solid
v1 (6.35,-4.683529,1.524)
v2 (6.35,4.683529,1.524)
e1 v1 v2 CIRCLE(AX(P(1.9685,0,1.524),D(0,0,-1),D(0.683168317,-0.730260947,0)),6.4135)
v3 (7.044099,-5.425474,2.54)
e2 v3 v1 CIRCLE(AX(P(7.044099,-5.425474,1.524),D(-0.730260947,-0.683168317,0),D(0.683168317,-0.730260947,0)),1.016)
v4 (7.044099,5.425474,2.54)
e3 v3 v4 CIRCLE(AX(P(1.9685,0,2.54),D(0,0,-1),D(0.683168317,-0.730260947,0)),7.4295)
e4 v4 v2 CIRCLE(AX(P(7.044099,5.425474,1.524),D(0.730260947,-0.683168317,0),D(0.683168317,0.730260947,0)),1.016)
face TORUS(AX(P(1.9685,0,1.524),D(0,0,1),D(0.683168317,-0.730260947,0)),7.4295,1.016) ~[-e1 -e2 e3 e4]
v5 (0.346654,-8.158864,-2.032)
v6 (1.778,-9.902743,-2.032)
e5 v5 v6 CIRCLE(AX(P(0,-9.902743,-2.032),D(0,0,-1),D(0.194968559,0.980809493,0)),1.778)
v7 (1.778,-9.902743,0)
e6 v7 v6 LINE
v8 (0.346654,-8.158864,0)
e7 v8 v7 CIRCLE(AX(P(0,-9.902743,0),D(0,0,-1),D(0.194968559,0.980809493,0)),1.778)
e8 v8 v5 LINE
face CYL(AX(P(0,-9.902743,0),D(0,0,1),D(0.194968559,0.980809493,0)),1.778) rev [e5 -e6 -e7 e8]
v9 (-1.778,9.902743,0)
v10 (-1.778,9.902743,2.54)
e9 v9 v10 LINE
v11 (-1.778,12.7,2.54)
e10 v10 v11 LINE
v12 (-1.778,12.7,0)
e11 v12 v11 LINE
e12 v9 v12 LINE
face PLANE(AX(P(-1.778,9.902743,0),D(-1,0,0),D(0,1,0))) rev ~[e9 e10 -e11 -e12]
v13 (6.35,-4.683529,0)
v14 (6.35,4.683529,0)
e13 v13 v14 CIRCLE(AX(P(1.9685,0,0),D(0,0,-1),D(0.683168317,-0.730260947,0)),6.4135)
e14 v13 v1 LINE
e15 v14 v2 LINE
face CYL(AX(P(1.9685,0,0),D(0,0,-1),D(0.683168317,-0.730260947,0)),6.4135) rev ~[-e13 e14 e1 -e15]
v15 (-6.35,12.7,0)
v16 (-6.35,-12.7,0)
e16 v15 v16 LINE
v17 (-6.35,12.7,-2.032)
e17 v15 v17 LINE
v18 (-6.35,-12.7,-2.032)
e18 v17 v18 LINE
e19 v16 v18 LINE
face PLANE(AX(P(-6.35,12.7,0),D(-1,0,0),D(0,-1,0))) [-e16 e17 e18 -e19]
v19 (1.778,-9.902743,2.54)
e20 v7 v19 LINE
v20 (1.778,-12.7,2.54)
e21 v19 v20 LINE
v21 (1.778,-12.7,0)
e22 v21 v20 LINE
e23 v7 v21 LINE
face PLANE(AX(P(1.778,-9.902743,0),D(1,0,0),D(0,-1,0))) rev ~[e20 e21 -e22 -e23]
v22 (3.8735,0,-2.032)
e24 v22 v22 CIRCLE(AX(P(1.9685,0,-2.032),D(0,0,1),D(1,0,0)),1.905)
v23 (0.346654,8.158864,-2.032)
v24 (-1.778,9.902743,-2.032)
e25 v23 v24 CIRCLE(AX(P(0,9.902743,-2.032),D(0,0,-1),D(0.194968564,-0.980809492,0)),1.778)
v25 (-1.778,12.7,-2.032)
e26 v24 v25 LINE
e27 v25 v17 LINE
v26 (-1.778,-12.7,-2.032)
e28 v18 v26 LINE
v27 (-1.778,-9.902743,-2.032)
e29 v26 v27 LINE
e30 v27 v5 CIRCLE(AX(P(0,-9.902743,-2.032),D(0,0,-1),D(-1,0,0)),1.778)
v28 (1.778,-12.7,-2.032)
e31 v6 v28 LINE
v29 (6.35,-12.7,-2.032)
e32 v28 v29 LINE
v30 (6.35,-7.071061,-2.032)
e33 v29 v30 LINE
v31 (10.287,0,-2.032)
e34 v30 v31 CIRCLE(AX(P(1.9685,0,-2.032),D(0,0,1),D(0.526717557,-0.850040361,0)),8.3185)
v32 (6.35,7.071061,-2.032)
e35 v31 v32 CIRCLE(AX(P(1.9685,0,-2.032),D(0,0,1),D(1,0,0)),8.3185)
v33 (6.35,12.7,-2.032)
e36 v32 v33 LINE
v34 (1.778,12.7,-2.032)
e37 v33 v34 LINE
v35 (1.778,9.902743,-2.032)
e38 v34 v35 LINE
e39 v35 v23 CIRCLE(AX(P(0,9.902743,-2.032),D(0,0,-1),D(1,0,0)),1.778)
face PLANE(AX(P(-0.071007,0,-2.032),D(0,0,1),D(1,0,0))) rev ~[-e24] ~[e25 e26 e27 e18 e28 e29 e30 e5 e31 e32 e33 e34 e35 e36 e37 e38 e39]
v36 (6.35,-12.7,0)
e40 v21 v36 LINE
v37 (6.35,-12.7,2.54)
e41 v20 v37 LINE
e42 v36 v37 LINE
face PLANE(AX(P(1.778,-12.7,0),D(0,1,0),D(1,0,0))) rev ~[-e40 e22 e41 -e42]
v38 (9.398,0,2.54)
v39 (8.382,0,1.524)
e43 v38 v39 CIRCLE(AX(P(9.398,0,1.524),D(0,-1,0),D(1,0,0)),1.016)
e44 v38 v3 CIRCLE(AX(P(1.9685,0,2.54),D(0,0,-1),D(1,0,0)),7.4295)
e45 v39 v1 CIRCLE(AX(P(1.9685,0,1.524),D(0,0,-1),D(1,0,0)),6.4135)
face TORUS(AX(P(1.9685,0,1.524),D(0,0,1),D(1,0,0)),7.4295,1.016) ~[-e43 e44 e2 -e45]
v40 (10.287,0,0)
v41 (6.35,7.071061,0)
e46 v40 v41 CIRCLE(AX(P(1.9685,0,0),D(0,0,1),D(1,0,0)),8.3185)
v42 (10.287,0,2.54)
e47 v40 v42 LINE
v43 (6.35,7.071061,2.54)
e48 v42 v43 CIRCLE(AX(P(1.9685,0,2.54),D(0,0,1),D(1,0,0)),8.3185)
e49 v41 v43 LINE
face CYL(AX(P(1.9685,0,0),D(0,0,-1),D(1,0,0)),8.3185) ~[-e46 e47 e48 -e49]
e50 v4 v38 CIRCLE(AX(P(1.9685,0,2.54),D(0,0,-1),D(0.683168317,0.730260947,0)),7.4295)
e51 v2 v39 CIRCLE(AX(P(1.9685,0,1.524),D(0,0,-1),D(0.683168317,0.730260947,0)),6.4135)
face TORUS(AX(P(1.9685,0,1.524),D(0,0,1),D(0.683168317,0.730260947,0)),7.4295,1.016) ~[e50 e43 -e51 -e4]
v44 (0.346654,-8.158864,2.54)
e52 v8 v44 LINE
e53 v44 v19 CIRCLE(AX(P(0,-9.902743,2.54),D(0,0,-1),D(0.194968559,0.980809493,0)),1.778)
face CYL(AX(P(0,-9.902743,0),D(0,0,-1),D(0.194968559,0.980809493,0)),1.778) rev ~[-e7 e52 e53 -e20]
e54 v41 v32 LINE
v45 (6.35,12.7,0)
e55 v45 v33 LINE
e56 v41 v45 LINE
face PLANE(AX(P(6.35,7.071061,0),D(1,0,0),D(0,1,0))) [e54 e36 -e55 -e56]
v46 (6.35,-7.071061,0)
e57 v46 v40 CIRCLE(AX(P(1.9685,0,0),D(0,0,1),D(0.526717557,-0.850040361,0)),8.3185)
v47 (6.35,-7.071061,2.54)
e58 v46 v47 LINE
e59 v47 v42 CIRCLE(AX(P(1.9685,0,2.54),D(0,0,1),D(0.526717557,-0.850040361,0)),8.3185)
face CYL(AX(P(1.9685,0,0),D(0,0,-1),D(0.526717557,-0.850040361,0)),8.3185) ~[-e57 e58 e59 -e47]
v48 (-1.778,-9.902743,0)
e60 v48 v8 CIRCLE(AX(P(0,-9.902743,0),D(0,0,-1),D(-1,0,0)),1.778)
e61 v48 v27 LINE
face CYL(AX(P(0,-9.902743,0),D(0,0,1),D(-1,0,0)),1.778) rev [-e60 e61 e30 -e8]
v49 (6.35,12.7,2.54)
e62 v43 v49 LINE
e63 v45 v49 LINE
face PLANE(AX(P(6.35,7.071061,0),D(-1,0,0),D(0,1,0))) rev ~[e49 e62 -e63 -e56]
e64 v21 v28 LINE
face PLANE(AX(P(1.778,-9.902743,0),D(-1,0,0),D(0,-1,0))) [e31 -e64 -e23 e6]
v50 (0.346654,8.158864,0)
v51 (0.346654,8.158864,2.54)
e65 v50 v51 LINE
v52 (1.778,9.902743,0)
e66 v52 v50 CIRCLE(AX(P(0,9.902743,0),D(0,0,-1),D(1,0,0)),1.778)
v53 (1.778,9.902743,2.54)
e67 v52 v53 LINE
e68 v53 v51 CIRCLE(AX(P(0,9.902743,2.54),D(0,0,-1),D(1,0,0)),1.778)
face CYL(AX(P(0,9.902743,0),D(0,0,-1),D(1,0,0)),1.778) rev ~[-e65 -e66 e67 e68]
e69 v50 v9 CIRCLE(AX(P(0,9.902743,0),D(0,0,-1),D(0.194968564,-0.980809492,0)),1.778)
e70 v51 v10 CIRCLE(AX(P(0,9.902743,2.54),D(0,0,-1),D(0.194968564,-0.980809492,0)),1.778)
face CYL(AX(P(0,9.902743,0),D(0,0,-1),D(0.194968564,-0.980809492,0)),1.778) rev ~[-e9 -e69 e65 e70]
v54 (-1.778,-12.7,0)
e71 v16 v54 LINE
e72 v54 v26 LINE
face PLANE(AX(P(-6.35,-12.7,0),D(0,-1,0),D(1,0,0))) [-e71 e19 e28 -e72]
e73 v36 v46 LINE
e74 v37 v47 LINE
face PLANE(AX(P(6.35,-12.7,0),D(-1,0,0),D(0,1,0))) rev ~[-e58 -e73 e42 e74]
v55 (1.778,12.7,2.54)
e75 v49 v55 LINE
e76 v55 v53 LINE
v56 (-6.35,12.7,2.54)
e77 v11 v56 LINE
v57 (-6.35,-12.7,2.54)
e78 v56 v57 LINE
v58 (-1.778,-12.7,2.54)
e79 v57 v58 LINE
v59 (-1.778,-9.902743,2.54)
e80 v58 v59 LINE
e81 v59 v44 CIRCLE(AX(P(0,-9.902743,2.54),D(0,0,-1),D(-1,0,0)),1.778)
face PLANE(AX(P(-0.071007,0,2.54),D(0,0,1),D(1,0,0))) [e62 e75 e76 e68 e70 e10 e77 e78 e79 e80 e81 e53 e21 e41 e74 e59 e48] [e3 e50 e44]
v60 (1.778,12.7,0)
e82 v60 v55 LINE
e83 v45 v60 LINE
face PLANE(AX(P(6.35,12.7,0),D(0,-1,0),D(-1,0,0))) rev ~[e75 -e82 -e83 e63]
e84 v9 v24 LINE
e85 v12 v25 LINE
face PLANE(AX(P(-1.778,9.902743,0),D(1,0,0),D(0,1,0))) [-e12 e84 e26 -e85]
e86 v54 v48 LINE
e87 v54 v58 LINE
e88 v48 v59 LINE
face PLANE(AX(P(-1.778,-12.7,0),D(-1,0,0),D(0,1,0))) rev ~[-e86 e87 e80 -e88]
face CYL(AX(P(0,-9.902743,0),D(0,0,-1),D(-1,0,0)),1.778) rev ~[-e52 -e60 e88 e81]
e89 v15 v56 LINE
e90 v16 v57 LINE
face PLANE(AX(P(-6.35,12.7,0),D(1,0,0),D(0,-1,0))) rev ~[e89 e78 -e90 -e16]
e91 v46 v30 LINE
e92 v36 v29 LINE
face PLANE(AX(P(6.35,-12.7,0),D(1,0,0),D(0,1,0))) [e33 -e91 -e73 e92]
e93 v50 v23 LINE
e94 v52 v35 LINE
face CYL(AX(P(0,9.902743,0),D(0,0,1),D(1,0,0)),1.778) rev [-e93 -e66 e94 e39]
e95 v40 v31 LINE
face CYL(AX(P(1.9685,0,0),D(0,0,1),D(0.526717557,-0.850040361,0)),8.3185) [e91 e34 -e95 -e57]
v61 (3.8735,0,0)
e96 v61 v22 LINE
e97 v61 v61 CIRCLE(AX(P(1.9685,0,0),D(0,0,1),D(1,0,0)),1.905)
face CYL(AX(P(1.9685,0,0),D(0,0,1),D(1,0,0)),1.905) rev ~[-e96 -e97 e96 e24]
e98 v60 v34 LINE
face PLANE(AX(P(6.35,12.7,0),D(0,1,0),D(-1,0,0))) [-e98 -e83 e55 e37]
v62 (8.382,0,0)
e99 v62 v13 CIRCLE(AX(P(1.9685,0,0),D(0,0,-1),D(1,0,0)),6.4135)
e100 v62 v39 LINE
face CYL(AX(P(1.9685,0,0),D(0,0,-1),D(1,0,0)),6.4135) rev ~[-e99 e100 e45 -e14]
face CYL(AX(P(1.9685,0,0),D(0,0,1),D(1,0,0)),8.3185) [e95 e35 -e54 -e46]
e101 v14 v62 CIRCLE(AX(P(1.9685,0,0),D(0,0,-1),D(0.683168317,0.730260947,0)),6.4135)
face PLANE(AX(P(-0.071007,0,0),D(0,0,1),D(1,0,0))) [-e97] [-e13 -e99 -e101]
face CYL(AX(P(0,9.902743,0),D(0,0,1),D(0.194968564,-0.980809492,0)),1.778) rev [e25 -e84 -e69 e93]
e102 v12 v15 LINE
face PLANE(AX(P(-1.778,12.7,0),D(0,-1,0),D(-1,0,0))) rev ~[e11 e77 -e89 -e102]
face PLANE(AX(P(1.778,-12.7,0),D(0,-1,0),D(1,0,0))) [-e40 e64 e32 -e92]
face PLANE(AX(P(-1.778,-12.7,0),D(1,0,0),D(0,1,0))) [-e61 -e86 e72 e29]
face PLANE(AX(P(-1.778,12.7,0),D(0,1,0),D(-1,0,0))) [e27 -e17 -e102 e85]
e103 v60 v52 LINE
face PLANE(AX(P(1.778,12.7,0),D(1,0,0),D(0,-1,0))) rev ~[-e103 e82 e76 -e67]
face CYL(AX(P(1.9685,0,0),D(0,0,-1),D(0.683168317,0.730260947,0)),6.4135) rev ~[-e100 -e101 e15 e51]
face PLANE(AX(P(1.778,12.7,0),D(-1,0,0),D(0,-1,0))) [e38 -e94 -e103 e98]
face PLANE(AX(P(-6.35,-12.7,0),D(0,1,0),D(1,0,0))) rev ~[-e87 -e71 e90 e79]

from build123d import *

# Parameters (mm, degrees)
F0_R     = 1.905
F1_DEPTH = 2.032
F2_DEPTH = 2.54
F3_R     = 1.016


# Not quite as in the source:
# - a feature names something its author has since deleted; it is built from what else it names


with BuildPart() as f1:
    # F0 (on Top) → F1 (new body)
    with BuildSketch(Plane.XY):
        with BuildLine():
            Line((6.35, 4.6835285843), (6.35, 7.0710607408))
            ThreePointArc((6.35, 7.0710607408), (3.4516559454, 8.1852117072), (0.3466541063, 8.1588637779))
            ThreePointArc((0.3466541063, 8.1588637779), (-4.4614598428, 5.2775997073), (-6.35, 1.93e-08))
            ThreePointArc((-6.35, 1.93e-08), (-4.4614598575, -5.2775996893), (0.3466540985, -8.1588637764))
            ThreePointArc((0.3466540985, -8.1588637764), (3.4516559415, -8.1852117079), (6.35, -7.0710607408))
            Line((6.35, -7.0710607408), (6.35, -4.6835285843))
            ThreePointArc((6.35, -4.6835285843), (-4.445, 0), (6.35, 4.6835285843))
        make_face()
        with BuildLine():
            ThreePointArc((10.287, 0), (9.2364071953, 4.0465994675), (6.35, 7.0710607408))
            Line((6.35, 7.0710607408), (6.35, 4.6835285843))
            ThreePointArc((6.35, 4.6835285843), (7.8521099675, 2.5526684078), (8.382, 0))
            ThreePointArc((8.382, 0), (7.8521099675, -2.5526684078), (6.35, -4.6835285843))
            Line((6.35, -4.6835285843), (6.35, -7.0710607408))
            ThreePointArc((6.35, -7.0710607408), (9.2364071953, -4.0465994675), (10.287, 0))
        make_face()
        with BuildLine():
            Line((-1.778, 9.9027430543), (-1.778, 12.7))
            Line((-1.778, 12.7), (-6.35, 12.7))
            Line((-6.35, 12.7), (-6.35, 1.93e-08))
            ThreePointArc((-6.35, 1.93e-08), (-4.4614598428, 5.2775997073), (0.3466541063, 8.1588637779))
            ThreePointArc((0.3466541063, 8.1588637779), (-1.1280365683, 8.528400484), (-1.778, 9.9027430543))
        make_face()
        with BuildLine():
            Line((6.35, 7.0710607408), (6.35, 12.7))
            Line((6.35, 12.7), (1.778, 12.7))
            Line((1.778, 12.7), (1.778, 9.9027430543))
            ThreePointArc((1.778, 9.9027430543), (1.3743425703, 8.774706486), (0.3466541063, 8.1588637779))
            ThreePointArc((0.3466541063, 8.1588637779), (3.4516559454, 8.1852117072), (6.35, 7.0710607408))
        make_face()
        with BuildLine():
            Line((6.35, -12.7), (6.35, -7.0710607408))
            ThreePointArc((6.35, -7.0710607408), (3.4516559415, -8.1852117079), (0.3466540985, -8.1588637764))
            ThreePointArc((0.3466540985, -8.1588637764), (1.3743425678, -8.7747064829), (1.778, -9.9027430543))
            Line((1.778, -9.9027430543), (1.778, -12.7))
            Line((1.778, -12.7), (6.35, -12.7))
        make_face()
        with BuildLine():
            ThreePointArc((0.3466540985, -8.1588637764), (-4.4614598575, -5.2775996893), (-6.35, 1.93e-08))
            Line((-6.35, 1.93e-08), (-6.35, -12.7))
            Line((-6.35, -12.7), (-1.778, -12.7))
            Line((-1.778, -12.7), (-1.778, -9.9027430543))
            ThreePointArc((-1.778, -9.9027430543), (-1.1280365714, -8.5284004866), (0.3466540985, -8.1588637764))
        make_face()
        with BuildLine():
            Line((6.35, -4.6835285843), (6.35, 4.6835285843))
            ThreePointArc((6.35, 4.6835285843), (-4.445, 0), (6.35, -4.6835285843))
        make_face()
        with Locations((1.9685, 0)):
            Circle(F0_R, mode=Mode.SUBTRACT)
        with BuildLine():
            ThreePointArc((8.382, 0), (7.8521099675, 2.5526684078), (6.35, 4.6835285843))
            Line((6.35, 4.6835285843), (6.35, -4.6835285843))
            ThreePointArc((6.35, -4.6835285843), (7.8521099675, -2.5526684078), (8.382, 0))
        make_face()
    extrude(amount=-F1_DEPTH)

    # F0 (on Top) → F2 (join)
    with BuildSketch(Plane.XY):
        with BuildLine():
            Line((6.35, 4.6835285843), (6.35, 7.0710607408))
            ThreePointArc((6.35, 7.0710607408), (3.4516559454, 8.1852117072), (0.3466541063, 8.1588637779))
            ThreePointArc((0.3466541063, 8.1588637779), (-4.4614598428, 5.2775997073), (-6.35, 1.93e-08))
            ThreePointArc((-6.35, 1.93e-08), (-4.4614598575, -5.2775996893), (0.3466540985, -8.1588637764))
            ThreePointArc((0.3466540985, -8.1588637764), (3.4516559415, -8.1852117079), (6.35, -7.0710607408))
            Line((6.35, -7.0710607408), (6.35, -4.6835285843))
            ThreePointArc((6.35, -4.6835285843), (-4.445, 0), (6.35, 4.6835285843))
        make_face()
        with BuildLine():
            ThreePointArc((10.287, 0), (9.2364071953, 4.0465994675), (6.35, 7.0710607408))
            Line((6.35, 7.0710607408), (6.35, 4.6835285843))
            ThreePointArc((6.35, 4.6835285843), (7.8521099675, 2.5526684078), (8.382, 0))
            ThreePointArc((8.382, 0), (7.8521099675, -2.5526684078), (6.35, -4.6835285843))
            Line((6.35, -4.6835285843), (6.35, -7.0710607408))
            ThreePointArc((6.35, -7.0710607408), (9.2364071953, -4.0465994675), (10.287, 0))
        make_face()
        with BuildLine():
            Line((6.35, 7.0710607408), (6.35, 12.7))
            Line((6.35, 12.7), (1.778, 12.7))
            Line((1.778, 12.7), (1.778, 9.9027430543))
            ThreePointArc((1.778, 9.9027430543), (1.3743425703, 8.774706486), (0.3466541063, 8.1588637779))
            ThreePointArc((0.3466541063, 8.1588637779), (3.4516559454, 8.1852117072), (6.35, 7.0710607408))
        make_face()
        with BuildLine():
            Line((-1.778, 9.9027430543), (-1.778, 12.7))
            Line((-1.778, 12.7), (-6.35, 12.7))
            Line((-6.35, 12.7), (-6.35, 1.93e-08))
            ThreePointArc((-6.35, 1.93e-08), (-4.4614598428, 5.2775997073), (0.3466541063, 8.1588637779))
            ThreePointArc((0.3466541063, 8.1588637779), (-1.1280365683, 8.528400484), (-1.778, 9.9027430543))
        make_face()
        with BuildLine():
            Line((6.35, -12.7), (6.35, -7.0710607408))
            ThreePointArc((6.35, -7.0710607408), (3.4516559415, -8.1852117079), (0.3466540985, -8.1588637764))
            ThreePointArc((0.3466540985, -8.1588637764), (1.3743425678, -8.7747064829), (1.778, -9.9027430543))
            Line((1.778, -9.9027430543), (1.778, -12.7))
            Line((1.778, -12.7), (6.35, -12.7))
        make_face()
        with BuildLine():
            ThreePointArc((0.3466540985, -8.1588637764), (-4.4614598575, -5.2775996893), (-6.35, 1.93e-08))
            Line((-6.35, 1.93e-08), (-6.35, -12.7))
            Line((-6.35, -12.7), (-1.778, -12.7))
            Line((-1.778, -12.7), (-1.778, -9.9027430543))
            ThreePointArc((-1.778, -9.9027430543), (-1.1280365714, -8.5284004866), (0.3466540985, -8.1588637764))
        make_face()
    extrude(amount=F2_DEPTH)

    # F3
    f3_edges = [f1.edges().sort_by_distance(p)[0] for p in [
        (-2.413, -4.683529, 2.54),
    ]]
    fillet(f3_edges, radius=F3_R)


solid = f1.part
